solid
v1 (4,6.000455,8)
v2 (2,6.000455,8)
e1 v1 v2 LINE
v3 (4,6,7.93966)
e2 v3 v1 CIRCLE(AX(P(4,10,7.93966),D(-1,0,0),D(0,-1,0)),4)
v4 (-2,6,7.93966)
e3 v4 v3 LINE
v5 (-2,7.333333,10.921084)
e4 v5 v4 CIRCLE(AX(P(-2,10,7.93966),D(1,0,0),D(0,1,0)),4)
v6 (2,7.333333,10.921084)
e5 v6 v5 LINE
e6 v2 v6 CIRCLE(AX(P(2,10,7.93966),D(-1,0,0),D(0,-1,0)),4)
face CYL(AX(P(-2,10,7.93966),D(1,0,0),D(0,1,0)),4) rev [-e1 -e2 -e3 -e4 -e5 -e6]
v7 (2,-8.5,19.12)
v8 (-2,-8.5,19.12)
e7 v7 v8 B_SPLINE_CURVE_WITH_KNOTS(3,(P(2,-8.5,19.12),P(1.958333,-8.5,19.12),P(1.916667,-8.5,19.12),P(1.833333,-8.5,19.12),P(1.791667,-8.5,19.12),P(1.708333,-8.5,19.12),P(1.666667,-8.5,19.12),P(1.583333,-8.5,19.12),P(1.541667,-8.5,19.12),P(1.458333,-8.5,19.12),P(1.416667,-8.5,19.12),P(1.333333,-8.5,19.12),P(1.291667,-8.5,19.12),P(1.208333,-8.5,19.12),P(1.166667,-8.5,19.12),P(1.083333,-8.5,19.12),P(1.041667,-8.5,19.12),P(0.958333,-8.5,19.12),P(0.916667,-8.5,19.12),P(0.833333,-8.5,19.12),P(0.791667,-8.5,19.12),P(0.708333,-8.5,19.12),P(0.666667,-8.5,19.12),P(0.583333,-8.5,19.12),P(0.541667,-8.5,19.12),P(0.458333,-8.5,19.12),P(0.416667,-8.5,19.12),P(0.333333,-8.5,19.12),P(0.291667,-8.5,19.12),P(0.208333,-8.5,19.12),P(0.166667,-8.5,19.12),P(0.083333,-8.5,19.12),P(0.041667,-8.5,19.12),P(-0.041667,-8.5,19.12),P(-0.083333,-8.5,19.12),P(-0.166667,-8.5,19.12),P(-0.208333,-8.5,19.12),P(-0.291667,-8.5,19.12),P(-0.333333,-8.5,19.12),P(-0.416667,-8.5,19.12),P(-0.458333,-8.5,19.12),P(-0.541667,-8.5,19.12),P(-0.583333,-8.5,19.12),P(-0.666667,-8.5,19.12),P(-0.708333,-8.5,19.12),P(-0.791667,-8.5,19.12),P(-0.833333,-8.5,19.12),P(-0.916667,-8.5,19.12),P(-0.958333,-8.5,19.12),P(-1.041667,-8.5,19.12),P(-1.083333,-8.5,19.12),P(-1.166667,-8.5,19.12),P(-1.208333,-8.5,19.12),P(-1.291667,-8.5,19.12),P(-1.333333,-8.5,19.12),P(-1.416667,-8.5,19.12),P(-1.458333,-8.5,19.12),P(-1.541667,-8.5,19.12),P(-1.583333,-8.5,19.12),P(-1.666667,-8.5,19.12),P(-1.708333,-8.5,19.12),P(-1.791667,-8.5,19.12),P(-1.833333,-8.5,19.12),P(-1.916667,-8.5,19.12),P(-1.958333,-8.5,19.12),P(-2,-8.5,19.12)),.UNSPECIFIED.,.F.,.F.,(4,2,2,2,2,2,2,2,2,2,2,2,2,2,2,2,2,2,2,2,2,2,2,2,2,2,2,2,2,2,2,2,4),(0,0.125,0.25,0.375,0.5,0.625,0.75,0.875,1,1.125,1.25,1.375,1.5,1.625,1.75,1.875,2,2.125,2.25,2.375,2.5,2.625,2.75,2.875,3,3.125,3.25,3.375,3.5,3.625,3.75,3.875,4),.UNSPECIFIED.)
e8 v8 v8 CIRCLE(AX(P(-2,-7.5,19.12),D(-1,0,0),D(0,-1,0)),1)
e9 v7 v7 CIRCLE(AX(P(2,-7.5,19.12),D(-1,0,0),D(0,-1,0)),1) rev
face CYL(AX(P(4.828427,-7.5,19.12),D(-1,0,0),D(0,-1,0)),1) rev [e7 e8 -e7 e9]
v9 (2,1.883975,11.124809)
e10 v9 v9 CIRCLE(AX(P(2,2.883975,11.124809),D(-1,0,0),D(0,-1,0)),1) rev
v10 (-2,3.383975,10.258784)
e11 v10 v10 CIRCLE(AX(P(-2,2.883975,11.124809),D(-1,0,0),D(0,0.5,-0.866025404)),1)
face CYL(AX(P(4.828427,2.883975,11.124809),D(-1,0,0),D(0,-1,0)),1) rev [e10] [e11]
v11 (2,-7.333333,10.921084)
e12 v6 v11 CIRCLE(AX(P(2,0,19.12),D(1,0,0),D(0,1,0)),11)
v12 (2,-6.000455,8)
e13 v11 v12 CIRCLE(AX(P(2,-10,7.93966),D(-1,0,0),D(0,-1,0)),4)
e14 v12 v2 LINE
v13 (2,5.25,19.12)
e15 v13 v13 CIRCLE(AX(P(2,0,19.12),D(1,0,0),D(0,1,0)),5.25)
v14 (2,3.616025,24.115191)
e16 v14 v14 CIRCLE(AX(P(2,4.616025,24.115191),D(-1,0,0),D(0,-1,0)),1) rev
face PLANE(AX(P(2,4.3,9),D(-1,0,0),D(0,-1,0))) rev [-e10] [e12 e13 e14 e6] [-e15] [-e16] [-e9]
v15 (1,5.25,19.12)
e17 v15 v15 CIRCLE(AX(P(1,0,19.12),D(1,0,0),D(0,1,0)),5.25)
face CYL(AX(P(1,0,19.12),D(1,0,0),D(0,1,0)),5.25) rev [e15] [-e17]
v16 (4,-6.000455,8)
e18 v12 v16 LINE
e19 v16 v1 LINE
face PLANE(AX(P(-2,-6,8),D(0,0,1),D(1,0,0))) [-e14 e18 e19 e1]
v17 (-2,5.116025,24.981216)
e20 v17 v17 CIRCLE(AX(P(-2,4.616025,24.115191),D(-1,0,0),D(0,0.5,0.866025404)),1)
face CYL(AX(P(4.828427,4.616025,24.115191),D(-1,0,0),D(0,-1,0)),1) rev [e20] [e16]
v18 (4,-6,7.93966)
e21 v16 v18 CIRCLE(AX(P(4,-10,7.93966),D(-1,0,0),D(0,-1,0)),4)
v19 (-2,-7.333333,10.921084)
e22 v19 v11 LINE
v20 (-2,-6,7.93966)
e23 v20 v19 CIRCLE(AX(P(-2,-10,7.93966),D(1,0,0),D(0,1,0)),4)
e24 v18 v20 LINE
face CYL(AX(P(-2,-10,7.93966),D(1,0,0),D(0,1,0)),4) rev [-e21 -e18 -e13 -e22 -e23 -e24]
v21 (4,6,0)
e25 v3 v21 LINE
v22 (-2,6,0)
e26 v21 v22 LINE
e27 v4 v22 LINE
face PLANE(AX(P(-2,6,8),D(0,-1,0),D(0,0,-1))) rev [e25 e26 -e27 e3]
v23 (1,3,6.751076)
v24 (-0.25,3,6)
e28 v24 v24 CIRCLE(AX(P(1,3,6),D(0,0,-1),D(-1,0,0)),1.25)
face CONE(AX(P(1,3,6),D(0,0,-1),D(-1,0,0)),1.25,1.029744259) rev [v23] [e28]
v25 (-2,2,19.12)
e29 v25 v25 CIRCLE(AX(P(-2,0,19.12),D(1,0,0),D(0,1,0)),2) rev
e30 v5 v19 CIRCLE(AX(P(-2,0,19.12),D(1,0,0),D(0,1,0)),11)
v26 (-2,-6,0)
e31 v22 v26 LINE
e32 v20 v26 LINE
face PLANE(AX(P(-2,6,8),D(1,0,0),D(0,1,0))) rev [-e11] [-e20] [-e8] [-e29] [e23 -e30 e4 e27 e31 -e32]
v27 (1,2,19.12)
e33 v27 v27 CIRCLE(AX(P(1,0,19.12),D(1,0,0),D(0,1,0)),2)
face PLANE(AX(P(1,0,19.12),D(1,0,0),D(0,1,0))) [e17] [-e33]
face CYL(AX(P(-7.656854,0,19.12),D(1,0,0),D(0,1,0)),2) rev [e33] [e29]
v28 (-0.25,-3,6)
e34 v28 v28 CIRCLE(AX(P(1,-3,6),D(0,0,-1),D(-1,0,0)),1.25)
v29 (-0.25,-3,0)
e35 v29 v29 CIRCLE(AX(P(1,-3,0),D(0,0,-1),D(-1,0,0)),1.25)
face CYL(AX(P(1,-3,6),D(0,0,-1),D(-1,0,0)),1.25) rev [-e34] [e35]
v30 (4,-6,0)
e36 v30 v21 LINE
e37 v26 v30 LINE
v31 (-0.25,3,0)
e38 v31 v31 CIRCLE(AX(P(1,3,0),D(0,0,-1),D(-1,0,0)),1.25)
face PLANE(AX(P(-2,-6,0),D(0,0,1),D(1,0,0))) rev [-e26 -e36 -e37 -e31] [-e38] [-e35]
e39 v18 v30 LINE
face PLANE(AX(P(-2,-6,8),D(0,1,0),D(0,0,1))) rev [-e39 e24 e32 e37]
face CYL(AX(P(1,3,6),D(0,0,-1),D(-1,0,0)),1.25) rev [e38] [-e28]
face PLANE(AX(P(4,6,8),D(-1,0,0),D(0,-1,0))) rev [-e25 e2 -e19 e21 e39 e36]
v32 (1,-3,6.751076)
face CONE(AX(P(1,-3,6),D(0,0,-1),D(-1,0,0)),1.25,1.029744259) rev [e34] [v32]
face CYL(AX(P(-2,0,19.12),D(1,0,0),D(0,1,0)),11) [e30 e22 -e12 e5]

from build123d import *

# Parameters (mm, degrees)
SKETCH1_W             = 6
SKETCH1_H             = 12
EXTRUDE1_DEPTH        = 8
SKETCH3_W             = 4
SKETCH3_H             = 8.6
EXTRUDE2_DEPTH        = 1
SKETCH2_R             = 1.25
EXTRUDE3_DEPTH        = 6
EXTRUDE4_DEPTH        = 4
SKETCH8_R             = 5.25
EXTRUDE7_DEPTH        = 1
SKETCH7_R             = 1
EXTRUDE6_DEPTH        = 4
CIRPATTERN1_COUNT     = 3
SKETCH9_R             = 2
EXTRUDE8_DEPTH        = 3
M3_TAPPED_HOLE1_D     = 2.5
M3_TAPPED_HOLE1_DEPTH = 6
M3_TAPPED_HOLE1_TIP   = 0.751075774
FILLET1_R             = 4


with BuildPart() as part:
    # Sketch1 → Extrude1 (new body)
    with BuildSketch(Plane.XY):
        with Locations((1, 0)):
            Rectangle(SKETCH1_W, SKETCH1_H)
    extrude(amount=EXTRUDE1_DEPTH)

    # Sketch3 → Extrude2 (add)
    with BuildSketch(Plane.XY.offset(8)):
        Rectangle(SKETCH3_W, SKETCH3_H)
    extrude(amount=EXTRUDE2_DEPTH)

    # Sketch2 → Extrude3 (cut)
    with BuildSketch(Plane(origin=(0, 0, 0), x_dir=(-1, 0, 0), z_dir=(0, 0, -1))):
        with Locations((-1, 3)):
            Circle(SKETCH2_R)
        with Locations((-1, -3)):
            Circle(SKETCH2_R)
    extrude(amount=-EXTRUDE3_DEPTH, mode=Mode.SUBTRACT)

    # Sketch4 → Extrude4 (add)
    with BuildSketch(Plane(origin=(2, 0, 0), x_dir=(0, 0, -1), z_dir=(1, 0, 0))):
        with BuildLine():
            Line((-9.900455543, 6), (-8, 6))
            Line((-8, 6), (-8, -6))
            Line((-8, -6), (-9.900455543, -6))
            ThreePointArc((-9.900455543, -6), (-30.12, 0), (-9.900455543, 6))
        make_face()
    extrude(amount=-EXTRUDE4_DEPTH)

    # Sketch8 → Extrude7 (cut)
    with BuildSketch(Plane(origin=(2, 0, 0), x_dir=(0, 0, -1), z_dir=(1, 0, 0))):
        with Locations(Location((-19.12, 0, 0), (0, 0, 90))):
            Circle(SKETCH8_R)
    extrude(amount=-EXTRUDE7_DEPTH, mode=Mode.SUBTRACT)

    # Sketch7 → Extrude6 (cut)
    with BuildSketch(Plane.ZY.offset(2)):
        with Locations(Location((19.12, -7.5, 0), (0, 0, 270))):
            Circle(SKETCH7_R)
    extrude6 = extrude(amount=-EXTRUDE6_DEPTH, mode=Mode.SUBTRACT)

    # CirPattern1: Extrude6 ×3 about axis
    cirpattern1_axis = Axis((0, 0, 18.12), (1, 0, 0))
    for i in range(1, CIRPATTERN1_COUNT):
        add(extrude6.rotate(cirpattern1_axis, i * 360 / CIRPATTERN1_COUNT), mode=Mode.SUBTRACT)

    # Sketch9 → Extrude8 (cut)
    with BuildSketch(Plane(origin=(1, 0, 0), x_dir=(0, 0, -1), z_dir=(1, 0, 0))):
        with Locations(Location((-19.12, 0, 0), (0, 0, 90))):
            Circle(SKETCH9_R)
    extrude(amount=-EXTRUDE8_DEPTH, mode=Mode.SUBTRACT)

    # M3 Tapped Hole1
    with Locations(Plane(origin=(1, 3, 0), x_dir=(-1, 0, 0), z_dir=(0, 0, -1))):
        with Locations((0, 0), (0, -6)):
            Hole(M3_TAPPED_HOLE1_D / 2, depth=M3_TAPPED_HOLE1_DEPTH)
            with Locations((0, 0, -(M3_TAPPED_HOLE1_DEPTH + M3_TAPPED_HOLE1_TIP / 2))):  # 118° drill point
                Cone(0, M3_TAPPED_HOLE1_D / 2, M3_TAPPED_HOLE1_TIP, mode=Mode.SUBTRACT)

    # Fillet1
    # the kernel refuses this fillet: 4 mm, written as the material it adds along each edge
    with BuildSketch(Plane(origin=(6.901988576, -6, 9.900455543), x_dir=(0, 0, -1), z_dir=(-1, 0, 0))) as fillet1_piece_1_section:
        with BuildLine():
            CenterArc((1.96079543, 4), FILLET1_R, 221.810314896, 48.189685104)
            ThreePointArc((-1.02062854, 1.333333333), (-0.484835824, 0.686169688), (0, 0))
            Line((0, 0), (1.96079543, 0))
        make_face()
    fillet1_piece_1 = extrude(amount=8.901988576, mode=Mode.PRIVATE)
    fillet1_piece_1 = split(fillet1_piece_1, bisect_by=Plane(origin=(4, -5.96007597, 7.969858609), z_dir=(-1, 0, 0)), keep=Keep.TOP, mode=Mode.PRIVATE)
    fillet1_piece_1 = split(fillet1_piece_1, bisect_by=Plane(origin=(3, -5.96007597, 8), z_dir=(0, 0, -1)), keep=Keep.TOP, mode=Mode.PRIVATE)
    fillet1_piece_1 = split(fillet1_piece_1, bisect_by=Plane(origin=(2, -5.96007597, 7.969858609), z_dir=(1, 0, 0)), keep=Keep.TOP, mode=Mode.PRIVATE)
    add(fillet1_piece_1)
    with BuildSketch(Plane(origin=(2, -6, 9.900455543), x_dir=(0, 0, -1), z_dir=(-1, 0, 0))) as fillet1_piece_2_section:
        with BuildLine():
            CenterArc((1.96079543, 4), FILLET1_R, 221.810314896, 48.189685104)
            ThreePointArc((-1.02062854, 1.333333333), (-0.484835824, 0.686169688), (0, 0))
            Line((0, 0), (1.96079543, 0))
        make_face()
    fillet1_piece_2 = extrude(amount=4, mode=Mode.PRIVATE)
    fillet1_piece_2 = split(fillet1_piece_2, bisect_by=Plane(origin=(0, -5.96007597, 8), z_dir=(0, 0, -1)), keep=Keep.TOP, mode=Mode.PRIVATE)
    add(fillet1_piece_2)
    with BuildSketch(Plane(origin=(2, -6, 9.900455543), x_dir=(0, 0, -1), z_dir=(-1, 0, 0))) as fillet1_piece_3_section:
        with BuildLine():
            CenterArc((1.96079543, 4), FILLET1_R, 221.810314896, 48.189685104)
            ThreePointArc((-1.02062854, 1.333333333), (-0.484835824, 0.686169688), (0, 0))
            Line((0, 0), (1.96079543, 0))
        make_face()
    fillet1_piece_3 = extrude(amount=4, mode=Mode.PRIVATE)
    fillet1_piece_3 = split(fillet1_piece_3, bisect_by=Plane(origin=(0, -6.284176822, 8), z_dir=(0, 0, 1)), keep=Keep.TOP, mode=Mode.PRIVATE)
    add(fillet1_piece_3)
    with BuildSketch(Plane(origin=(6.901988576, 6, 9.900455543), x_dir=(0, 0, -1), z_dir=(-1, 0, 0))) as fillet1_piece_4_section:
        with BuildLine():
            CenterArc((1.96079543, -4), FILLET1_R, 90, 48.189685104)
            ThreePointArc((-1.02062854, -1.333333333), (-0.484835824, -0.686169688), (0, 0))
            Line((0, 0), (1.96079543, 0))
        make_face()
    fillet1_piece_4 = extrude(amount=8.901988576, mode=Mode.PRIVATE)
    fillet1_piece_4 = split(fillet1_piece_4, bisect_by=Plane(origin=(2, 5.96007597, 7.969858609), z_dir=(1, 0, 0)), keep=Keep.TOP, mode=Mode.PRIVATE)
    fillet1_piece_4 = split(fillet1_piece_4, bisect_by=Plane(origin=(3, 5.96007597, 8), z_dir=(0, 0, -1)), keep=Keep.TOP, mode=Mode.PRIVATE)
    fillet1_piece_4 = split(fillet1_piece_4, bisect_by=Plane(origin=(4, 5.96007597, 7.969858609), z_dir=(-1, 0, 0)), keep=Keep.TOP, mode=Mode.PRIVATE)
    add(fillet1_piece_4)
    with BuildSketch(Plane(origin=(2, 6, 9.900455543), x_dir=(0, 0, -1), z_dir=(-1, 0, 0))) as fillet1_piece_5_section:
        with BuildLine():
            CenterArc((1.96079543, -4), FILLET1_R, 90, 48.189685104)
            ThreePointArc((-1.02062854, -1.333333333), (-0.484835824, -0.686169688), (0, 0))
            Line((0, 0), (1.96079543, 0))
        make_face()
    fillet1_piece_5 = extrude(amount=4, mode=Mode.PRIVATE)
    fillet1_piece_5 = split(fillet1_piece_5, bisect_by=Plane(origin=(0, 5.96007597, 8), z_dir=(0, 0, -1)), keep=Keep.TOP, mode=Mode.PRIVATE)
    add(fillet1_piece_5)
    with BuildSketch(Plane(origin=(2, 6, 9.900455543), x_dir=(0, 0, -1), z_dir=(-1, 0, 0))) as fillet1_piece_6_section:
        with BuildLine():
            CenterArc((1.96079543, -4), FILLET1_R, 90, 48.189685104)
            ThreePointArc((-1.02062854, -1.333333333), (-0.484835824, -0.686169688), (0, 0))
            Line((0, 0), (1.96079543, 0))
        make_face()
    fillet1_piece_6 = extrude(amount=4, mode=Mode.PRIVATE)
    fillet1_piece_6 = split(fillet1_piece_6, bisect_by=Plane(origin=(0, 6.284176822, 8), z_dir=(0, 0, 1)), keep=Keep.TOP, mode=Mode.PRIVATE)
    add(fillet1_piece_6)


solid = part.part
